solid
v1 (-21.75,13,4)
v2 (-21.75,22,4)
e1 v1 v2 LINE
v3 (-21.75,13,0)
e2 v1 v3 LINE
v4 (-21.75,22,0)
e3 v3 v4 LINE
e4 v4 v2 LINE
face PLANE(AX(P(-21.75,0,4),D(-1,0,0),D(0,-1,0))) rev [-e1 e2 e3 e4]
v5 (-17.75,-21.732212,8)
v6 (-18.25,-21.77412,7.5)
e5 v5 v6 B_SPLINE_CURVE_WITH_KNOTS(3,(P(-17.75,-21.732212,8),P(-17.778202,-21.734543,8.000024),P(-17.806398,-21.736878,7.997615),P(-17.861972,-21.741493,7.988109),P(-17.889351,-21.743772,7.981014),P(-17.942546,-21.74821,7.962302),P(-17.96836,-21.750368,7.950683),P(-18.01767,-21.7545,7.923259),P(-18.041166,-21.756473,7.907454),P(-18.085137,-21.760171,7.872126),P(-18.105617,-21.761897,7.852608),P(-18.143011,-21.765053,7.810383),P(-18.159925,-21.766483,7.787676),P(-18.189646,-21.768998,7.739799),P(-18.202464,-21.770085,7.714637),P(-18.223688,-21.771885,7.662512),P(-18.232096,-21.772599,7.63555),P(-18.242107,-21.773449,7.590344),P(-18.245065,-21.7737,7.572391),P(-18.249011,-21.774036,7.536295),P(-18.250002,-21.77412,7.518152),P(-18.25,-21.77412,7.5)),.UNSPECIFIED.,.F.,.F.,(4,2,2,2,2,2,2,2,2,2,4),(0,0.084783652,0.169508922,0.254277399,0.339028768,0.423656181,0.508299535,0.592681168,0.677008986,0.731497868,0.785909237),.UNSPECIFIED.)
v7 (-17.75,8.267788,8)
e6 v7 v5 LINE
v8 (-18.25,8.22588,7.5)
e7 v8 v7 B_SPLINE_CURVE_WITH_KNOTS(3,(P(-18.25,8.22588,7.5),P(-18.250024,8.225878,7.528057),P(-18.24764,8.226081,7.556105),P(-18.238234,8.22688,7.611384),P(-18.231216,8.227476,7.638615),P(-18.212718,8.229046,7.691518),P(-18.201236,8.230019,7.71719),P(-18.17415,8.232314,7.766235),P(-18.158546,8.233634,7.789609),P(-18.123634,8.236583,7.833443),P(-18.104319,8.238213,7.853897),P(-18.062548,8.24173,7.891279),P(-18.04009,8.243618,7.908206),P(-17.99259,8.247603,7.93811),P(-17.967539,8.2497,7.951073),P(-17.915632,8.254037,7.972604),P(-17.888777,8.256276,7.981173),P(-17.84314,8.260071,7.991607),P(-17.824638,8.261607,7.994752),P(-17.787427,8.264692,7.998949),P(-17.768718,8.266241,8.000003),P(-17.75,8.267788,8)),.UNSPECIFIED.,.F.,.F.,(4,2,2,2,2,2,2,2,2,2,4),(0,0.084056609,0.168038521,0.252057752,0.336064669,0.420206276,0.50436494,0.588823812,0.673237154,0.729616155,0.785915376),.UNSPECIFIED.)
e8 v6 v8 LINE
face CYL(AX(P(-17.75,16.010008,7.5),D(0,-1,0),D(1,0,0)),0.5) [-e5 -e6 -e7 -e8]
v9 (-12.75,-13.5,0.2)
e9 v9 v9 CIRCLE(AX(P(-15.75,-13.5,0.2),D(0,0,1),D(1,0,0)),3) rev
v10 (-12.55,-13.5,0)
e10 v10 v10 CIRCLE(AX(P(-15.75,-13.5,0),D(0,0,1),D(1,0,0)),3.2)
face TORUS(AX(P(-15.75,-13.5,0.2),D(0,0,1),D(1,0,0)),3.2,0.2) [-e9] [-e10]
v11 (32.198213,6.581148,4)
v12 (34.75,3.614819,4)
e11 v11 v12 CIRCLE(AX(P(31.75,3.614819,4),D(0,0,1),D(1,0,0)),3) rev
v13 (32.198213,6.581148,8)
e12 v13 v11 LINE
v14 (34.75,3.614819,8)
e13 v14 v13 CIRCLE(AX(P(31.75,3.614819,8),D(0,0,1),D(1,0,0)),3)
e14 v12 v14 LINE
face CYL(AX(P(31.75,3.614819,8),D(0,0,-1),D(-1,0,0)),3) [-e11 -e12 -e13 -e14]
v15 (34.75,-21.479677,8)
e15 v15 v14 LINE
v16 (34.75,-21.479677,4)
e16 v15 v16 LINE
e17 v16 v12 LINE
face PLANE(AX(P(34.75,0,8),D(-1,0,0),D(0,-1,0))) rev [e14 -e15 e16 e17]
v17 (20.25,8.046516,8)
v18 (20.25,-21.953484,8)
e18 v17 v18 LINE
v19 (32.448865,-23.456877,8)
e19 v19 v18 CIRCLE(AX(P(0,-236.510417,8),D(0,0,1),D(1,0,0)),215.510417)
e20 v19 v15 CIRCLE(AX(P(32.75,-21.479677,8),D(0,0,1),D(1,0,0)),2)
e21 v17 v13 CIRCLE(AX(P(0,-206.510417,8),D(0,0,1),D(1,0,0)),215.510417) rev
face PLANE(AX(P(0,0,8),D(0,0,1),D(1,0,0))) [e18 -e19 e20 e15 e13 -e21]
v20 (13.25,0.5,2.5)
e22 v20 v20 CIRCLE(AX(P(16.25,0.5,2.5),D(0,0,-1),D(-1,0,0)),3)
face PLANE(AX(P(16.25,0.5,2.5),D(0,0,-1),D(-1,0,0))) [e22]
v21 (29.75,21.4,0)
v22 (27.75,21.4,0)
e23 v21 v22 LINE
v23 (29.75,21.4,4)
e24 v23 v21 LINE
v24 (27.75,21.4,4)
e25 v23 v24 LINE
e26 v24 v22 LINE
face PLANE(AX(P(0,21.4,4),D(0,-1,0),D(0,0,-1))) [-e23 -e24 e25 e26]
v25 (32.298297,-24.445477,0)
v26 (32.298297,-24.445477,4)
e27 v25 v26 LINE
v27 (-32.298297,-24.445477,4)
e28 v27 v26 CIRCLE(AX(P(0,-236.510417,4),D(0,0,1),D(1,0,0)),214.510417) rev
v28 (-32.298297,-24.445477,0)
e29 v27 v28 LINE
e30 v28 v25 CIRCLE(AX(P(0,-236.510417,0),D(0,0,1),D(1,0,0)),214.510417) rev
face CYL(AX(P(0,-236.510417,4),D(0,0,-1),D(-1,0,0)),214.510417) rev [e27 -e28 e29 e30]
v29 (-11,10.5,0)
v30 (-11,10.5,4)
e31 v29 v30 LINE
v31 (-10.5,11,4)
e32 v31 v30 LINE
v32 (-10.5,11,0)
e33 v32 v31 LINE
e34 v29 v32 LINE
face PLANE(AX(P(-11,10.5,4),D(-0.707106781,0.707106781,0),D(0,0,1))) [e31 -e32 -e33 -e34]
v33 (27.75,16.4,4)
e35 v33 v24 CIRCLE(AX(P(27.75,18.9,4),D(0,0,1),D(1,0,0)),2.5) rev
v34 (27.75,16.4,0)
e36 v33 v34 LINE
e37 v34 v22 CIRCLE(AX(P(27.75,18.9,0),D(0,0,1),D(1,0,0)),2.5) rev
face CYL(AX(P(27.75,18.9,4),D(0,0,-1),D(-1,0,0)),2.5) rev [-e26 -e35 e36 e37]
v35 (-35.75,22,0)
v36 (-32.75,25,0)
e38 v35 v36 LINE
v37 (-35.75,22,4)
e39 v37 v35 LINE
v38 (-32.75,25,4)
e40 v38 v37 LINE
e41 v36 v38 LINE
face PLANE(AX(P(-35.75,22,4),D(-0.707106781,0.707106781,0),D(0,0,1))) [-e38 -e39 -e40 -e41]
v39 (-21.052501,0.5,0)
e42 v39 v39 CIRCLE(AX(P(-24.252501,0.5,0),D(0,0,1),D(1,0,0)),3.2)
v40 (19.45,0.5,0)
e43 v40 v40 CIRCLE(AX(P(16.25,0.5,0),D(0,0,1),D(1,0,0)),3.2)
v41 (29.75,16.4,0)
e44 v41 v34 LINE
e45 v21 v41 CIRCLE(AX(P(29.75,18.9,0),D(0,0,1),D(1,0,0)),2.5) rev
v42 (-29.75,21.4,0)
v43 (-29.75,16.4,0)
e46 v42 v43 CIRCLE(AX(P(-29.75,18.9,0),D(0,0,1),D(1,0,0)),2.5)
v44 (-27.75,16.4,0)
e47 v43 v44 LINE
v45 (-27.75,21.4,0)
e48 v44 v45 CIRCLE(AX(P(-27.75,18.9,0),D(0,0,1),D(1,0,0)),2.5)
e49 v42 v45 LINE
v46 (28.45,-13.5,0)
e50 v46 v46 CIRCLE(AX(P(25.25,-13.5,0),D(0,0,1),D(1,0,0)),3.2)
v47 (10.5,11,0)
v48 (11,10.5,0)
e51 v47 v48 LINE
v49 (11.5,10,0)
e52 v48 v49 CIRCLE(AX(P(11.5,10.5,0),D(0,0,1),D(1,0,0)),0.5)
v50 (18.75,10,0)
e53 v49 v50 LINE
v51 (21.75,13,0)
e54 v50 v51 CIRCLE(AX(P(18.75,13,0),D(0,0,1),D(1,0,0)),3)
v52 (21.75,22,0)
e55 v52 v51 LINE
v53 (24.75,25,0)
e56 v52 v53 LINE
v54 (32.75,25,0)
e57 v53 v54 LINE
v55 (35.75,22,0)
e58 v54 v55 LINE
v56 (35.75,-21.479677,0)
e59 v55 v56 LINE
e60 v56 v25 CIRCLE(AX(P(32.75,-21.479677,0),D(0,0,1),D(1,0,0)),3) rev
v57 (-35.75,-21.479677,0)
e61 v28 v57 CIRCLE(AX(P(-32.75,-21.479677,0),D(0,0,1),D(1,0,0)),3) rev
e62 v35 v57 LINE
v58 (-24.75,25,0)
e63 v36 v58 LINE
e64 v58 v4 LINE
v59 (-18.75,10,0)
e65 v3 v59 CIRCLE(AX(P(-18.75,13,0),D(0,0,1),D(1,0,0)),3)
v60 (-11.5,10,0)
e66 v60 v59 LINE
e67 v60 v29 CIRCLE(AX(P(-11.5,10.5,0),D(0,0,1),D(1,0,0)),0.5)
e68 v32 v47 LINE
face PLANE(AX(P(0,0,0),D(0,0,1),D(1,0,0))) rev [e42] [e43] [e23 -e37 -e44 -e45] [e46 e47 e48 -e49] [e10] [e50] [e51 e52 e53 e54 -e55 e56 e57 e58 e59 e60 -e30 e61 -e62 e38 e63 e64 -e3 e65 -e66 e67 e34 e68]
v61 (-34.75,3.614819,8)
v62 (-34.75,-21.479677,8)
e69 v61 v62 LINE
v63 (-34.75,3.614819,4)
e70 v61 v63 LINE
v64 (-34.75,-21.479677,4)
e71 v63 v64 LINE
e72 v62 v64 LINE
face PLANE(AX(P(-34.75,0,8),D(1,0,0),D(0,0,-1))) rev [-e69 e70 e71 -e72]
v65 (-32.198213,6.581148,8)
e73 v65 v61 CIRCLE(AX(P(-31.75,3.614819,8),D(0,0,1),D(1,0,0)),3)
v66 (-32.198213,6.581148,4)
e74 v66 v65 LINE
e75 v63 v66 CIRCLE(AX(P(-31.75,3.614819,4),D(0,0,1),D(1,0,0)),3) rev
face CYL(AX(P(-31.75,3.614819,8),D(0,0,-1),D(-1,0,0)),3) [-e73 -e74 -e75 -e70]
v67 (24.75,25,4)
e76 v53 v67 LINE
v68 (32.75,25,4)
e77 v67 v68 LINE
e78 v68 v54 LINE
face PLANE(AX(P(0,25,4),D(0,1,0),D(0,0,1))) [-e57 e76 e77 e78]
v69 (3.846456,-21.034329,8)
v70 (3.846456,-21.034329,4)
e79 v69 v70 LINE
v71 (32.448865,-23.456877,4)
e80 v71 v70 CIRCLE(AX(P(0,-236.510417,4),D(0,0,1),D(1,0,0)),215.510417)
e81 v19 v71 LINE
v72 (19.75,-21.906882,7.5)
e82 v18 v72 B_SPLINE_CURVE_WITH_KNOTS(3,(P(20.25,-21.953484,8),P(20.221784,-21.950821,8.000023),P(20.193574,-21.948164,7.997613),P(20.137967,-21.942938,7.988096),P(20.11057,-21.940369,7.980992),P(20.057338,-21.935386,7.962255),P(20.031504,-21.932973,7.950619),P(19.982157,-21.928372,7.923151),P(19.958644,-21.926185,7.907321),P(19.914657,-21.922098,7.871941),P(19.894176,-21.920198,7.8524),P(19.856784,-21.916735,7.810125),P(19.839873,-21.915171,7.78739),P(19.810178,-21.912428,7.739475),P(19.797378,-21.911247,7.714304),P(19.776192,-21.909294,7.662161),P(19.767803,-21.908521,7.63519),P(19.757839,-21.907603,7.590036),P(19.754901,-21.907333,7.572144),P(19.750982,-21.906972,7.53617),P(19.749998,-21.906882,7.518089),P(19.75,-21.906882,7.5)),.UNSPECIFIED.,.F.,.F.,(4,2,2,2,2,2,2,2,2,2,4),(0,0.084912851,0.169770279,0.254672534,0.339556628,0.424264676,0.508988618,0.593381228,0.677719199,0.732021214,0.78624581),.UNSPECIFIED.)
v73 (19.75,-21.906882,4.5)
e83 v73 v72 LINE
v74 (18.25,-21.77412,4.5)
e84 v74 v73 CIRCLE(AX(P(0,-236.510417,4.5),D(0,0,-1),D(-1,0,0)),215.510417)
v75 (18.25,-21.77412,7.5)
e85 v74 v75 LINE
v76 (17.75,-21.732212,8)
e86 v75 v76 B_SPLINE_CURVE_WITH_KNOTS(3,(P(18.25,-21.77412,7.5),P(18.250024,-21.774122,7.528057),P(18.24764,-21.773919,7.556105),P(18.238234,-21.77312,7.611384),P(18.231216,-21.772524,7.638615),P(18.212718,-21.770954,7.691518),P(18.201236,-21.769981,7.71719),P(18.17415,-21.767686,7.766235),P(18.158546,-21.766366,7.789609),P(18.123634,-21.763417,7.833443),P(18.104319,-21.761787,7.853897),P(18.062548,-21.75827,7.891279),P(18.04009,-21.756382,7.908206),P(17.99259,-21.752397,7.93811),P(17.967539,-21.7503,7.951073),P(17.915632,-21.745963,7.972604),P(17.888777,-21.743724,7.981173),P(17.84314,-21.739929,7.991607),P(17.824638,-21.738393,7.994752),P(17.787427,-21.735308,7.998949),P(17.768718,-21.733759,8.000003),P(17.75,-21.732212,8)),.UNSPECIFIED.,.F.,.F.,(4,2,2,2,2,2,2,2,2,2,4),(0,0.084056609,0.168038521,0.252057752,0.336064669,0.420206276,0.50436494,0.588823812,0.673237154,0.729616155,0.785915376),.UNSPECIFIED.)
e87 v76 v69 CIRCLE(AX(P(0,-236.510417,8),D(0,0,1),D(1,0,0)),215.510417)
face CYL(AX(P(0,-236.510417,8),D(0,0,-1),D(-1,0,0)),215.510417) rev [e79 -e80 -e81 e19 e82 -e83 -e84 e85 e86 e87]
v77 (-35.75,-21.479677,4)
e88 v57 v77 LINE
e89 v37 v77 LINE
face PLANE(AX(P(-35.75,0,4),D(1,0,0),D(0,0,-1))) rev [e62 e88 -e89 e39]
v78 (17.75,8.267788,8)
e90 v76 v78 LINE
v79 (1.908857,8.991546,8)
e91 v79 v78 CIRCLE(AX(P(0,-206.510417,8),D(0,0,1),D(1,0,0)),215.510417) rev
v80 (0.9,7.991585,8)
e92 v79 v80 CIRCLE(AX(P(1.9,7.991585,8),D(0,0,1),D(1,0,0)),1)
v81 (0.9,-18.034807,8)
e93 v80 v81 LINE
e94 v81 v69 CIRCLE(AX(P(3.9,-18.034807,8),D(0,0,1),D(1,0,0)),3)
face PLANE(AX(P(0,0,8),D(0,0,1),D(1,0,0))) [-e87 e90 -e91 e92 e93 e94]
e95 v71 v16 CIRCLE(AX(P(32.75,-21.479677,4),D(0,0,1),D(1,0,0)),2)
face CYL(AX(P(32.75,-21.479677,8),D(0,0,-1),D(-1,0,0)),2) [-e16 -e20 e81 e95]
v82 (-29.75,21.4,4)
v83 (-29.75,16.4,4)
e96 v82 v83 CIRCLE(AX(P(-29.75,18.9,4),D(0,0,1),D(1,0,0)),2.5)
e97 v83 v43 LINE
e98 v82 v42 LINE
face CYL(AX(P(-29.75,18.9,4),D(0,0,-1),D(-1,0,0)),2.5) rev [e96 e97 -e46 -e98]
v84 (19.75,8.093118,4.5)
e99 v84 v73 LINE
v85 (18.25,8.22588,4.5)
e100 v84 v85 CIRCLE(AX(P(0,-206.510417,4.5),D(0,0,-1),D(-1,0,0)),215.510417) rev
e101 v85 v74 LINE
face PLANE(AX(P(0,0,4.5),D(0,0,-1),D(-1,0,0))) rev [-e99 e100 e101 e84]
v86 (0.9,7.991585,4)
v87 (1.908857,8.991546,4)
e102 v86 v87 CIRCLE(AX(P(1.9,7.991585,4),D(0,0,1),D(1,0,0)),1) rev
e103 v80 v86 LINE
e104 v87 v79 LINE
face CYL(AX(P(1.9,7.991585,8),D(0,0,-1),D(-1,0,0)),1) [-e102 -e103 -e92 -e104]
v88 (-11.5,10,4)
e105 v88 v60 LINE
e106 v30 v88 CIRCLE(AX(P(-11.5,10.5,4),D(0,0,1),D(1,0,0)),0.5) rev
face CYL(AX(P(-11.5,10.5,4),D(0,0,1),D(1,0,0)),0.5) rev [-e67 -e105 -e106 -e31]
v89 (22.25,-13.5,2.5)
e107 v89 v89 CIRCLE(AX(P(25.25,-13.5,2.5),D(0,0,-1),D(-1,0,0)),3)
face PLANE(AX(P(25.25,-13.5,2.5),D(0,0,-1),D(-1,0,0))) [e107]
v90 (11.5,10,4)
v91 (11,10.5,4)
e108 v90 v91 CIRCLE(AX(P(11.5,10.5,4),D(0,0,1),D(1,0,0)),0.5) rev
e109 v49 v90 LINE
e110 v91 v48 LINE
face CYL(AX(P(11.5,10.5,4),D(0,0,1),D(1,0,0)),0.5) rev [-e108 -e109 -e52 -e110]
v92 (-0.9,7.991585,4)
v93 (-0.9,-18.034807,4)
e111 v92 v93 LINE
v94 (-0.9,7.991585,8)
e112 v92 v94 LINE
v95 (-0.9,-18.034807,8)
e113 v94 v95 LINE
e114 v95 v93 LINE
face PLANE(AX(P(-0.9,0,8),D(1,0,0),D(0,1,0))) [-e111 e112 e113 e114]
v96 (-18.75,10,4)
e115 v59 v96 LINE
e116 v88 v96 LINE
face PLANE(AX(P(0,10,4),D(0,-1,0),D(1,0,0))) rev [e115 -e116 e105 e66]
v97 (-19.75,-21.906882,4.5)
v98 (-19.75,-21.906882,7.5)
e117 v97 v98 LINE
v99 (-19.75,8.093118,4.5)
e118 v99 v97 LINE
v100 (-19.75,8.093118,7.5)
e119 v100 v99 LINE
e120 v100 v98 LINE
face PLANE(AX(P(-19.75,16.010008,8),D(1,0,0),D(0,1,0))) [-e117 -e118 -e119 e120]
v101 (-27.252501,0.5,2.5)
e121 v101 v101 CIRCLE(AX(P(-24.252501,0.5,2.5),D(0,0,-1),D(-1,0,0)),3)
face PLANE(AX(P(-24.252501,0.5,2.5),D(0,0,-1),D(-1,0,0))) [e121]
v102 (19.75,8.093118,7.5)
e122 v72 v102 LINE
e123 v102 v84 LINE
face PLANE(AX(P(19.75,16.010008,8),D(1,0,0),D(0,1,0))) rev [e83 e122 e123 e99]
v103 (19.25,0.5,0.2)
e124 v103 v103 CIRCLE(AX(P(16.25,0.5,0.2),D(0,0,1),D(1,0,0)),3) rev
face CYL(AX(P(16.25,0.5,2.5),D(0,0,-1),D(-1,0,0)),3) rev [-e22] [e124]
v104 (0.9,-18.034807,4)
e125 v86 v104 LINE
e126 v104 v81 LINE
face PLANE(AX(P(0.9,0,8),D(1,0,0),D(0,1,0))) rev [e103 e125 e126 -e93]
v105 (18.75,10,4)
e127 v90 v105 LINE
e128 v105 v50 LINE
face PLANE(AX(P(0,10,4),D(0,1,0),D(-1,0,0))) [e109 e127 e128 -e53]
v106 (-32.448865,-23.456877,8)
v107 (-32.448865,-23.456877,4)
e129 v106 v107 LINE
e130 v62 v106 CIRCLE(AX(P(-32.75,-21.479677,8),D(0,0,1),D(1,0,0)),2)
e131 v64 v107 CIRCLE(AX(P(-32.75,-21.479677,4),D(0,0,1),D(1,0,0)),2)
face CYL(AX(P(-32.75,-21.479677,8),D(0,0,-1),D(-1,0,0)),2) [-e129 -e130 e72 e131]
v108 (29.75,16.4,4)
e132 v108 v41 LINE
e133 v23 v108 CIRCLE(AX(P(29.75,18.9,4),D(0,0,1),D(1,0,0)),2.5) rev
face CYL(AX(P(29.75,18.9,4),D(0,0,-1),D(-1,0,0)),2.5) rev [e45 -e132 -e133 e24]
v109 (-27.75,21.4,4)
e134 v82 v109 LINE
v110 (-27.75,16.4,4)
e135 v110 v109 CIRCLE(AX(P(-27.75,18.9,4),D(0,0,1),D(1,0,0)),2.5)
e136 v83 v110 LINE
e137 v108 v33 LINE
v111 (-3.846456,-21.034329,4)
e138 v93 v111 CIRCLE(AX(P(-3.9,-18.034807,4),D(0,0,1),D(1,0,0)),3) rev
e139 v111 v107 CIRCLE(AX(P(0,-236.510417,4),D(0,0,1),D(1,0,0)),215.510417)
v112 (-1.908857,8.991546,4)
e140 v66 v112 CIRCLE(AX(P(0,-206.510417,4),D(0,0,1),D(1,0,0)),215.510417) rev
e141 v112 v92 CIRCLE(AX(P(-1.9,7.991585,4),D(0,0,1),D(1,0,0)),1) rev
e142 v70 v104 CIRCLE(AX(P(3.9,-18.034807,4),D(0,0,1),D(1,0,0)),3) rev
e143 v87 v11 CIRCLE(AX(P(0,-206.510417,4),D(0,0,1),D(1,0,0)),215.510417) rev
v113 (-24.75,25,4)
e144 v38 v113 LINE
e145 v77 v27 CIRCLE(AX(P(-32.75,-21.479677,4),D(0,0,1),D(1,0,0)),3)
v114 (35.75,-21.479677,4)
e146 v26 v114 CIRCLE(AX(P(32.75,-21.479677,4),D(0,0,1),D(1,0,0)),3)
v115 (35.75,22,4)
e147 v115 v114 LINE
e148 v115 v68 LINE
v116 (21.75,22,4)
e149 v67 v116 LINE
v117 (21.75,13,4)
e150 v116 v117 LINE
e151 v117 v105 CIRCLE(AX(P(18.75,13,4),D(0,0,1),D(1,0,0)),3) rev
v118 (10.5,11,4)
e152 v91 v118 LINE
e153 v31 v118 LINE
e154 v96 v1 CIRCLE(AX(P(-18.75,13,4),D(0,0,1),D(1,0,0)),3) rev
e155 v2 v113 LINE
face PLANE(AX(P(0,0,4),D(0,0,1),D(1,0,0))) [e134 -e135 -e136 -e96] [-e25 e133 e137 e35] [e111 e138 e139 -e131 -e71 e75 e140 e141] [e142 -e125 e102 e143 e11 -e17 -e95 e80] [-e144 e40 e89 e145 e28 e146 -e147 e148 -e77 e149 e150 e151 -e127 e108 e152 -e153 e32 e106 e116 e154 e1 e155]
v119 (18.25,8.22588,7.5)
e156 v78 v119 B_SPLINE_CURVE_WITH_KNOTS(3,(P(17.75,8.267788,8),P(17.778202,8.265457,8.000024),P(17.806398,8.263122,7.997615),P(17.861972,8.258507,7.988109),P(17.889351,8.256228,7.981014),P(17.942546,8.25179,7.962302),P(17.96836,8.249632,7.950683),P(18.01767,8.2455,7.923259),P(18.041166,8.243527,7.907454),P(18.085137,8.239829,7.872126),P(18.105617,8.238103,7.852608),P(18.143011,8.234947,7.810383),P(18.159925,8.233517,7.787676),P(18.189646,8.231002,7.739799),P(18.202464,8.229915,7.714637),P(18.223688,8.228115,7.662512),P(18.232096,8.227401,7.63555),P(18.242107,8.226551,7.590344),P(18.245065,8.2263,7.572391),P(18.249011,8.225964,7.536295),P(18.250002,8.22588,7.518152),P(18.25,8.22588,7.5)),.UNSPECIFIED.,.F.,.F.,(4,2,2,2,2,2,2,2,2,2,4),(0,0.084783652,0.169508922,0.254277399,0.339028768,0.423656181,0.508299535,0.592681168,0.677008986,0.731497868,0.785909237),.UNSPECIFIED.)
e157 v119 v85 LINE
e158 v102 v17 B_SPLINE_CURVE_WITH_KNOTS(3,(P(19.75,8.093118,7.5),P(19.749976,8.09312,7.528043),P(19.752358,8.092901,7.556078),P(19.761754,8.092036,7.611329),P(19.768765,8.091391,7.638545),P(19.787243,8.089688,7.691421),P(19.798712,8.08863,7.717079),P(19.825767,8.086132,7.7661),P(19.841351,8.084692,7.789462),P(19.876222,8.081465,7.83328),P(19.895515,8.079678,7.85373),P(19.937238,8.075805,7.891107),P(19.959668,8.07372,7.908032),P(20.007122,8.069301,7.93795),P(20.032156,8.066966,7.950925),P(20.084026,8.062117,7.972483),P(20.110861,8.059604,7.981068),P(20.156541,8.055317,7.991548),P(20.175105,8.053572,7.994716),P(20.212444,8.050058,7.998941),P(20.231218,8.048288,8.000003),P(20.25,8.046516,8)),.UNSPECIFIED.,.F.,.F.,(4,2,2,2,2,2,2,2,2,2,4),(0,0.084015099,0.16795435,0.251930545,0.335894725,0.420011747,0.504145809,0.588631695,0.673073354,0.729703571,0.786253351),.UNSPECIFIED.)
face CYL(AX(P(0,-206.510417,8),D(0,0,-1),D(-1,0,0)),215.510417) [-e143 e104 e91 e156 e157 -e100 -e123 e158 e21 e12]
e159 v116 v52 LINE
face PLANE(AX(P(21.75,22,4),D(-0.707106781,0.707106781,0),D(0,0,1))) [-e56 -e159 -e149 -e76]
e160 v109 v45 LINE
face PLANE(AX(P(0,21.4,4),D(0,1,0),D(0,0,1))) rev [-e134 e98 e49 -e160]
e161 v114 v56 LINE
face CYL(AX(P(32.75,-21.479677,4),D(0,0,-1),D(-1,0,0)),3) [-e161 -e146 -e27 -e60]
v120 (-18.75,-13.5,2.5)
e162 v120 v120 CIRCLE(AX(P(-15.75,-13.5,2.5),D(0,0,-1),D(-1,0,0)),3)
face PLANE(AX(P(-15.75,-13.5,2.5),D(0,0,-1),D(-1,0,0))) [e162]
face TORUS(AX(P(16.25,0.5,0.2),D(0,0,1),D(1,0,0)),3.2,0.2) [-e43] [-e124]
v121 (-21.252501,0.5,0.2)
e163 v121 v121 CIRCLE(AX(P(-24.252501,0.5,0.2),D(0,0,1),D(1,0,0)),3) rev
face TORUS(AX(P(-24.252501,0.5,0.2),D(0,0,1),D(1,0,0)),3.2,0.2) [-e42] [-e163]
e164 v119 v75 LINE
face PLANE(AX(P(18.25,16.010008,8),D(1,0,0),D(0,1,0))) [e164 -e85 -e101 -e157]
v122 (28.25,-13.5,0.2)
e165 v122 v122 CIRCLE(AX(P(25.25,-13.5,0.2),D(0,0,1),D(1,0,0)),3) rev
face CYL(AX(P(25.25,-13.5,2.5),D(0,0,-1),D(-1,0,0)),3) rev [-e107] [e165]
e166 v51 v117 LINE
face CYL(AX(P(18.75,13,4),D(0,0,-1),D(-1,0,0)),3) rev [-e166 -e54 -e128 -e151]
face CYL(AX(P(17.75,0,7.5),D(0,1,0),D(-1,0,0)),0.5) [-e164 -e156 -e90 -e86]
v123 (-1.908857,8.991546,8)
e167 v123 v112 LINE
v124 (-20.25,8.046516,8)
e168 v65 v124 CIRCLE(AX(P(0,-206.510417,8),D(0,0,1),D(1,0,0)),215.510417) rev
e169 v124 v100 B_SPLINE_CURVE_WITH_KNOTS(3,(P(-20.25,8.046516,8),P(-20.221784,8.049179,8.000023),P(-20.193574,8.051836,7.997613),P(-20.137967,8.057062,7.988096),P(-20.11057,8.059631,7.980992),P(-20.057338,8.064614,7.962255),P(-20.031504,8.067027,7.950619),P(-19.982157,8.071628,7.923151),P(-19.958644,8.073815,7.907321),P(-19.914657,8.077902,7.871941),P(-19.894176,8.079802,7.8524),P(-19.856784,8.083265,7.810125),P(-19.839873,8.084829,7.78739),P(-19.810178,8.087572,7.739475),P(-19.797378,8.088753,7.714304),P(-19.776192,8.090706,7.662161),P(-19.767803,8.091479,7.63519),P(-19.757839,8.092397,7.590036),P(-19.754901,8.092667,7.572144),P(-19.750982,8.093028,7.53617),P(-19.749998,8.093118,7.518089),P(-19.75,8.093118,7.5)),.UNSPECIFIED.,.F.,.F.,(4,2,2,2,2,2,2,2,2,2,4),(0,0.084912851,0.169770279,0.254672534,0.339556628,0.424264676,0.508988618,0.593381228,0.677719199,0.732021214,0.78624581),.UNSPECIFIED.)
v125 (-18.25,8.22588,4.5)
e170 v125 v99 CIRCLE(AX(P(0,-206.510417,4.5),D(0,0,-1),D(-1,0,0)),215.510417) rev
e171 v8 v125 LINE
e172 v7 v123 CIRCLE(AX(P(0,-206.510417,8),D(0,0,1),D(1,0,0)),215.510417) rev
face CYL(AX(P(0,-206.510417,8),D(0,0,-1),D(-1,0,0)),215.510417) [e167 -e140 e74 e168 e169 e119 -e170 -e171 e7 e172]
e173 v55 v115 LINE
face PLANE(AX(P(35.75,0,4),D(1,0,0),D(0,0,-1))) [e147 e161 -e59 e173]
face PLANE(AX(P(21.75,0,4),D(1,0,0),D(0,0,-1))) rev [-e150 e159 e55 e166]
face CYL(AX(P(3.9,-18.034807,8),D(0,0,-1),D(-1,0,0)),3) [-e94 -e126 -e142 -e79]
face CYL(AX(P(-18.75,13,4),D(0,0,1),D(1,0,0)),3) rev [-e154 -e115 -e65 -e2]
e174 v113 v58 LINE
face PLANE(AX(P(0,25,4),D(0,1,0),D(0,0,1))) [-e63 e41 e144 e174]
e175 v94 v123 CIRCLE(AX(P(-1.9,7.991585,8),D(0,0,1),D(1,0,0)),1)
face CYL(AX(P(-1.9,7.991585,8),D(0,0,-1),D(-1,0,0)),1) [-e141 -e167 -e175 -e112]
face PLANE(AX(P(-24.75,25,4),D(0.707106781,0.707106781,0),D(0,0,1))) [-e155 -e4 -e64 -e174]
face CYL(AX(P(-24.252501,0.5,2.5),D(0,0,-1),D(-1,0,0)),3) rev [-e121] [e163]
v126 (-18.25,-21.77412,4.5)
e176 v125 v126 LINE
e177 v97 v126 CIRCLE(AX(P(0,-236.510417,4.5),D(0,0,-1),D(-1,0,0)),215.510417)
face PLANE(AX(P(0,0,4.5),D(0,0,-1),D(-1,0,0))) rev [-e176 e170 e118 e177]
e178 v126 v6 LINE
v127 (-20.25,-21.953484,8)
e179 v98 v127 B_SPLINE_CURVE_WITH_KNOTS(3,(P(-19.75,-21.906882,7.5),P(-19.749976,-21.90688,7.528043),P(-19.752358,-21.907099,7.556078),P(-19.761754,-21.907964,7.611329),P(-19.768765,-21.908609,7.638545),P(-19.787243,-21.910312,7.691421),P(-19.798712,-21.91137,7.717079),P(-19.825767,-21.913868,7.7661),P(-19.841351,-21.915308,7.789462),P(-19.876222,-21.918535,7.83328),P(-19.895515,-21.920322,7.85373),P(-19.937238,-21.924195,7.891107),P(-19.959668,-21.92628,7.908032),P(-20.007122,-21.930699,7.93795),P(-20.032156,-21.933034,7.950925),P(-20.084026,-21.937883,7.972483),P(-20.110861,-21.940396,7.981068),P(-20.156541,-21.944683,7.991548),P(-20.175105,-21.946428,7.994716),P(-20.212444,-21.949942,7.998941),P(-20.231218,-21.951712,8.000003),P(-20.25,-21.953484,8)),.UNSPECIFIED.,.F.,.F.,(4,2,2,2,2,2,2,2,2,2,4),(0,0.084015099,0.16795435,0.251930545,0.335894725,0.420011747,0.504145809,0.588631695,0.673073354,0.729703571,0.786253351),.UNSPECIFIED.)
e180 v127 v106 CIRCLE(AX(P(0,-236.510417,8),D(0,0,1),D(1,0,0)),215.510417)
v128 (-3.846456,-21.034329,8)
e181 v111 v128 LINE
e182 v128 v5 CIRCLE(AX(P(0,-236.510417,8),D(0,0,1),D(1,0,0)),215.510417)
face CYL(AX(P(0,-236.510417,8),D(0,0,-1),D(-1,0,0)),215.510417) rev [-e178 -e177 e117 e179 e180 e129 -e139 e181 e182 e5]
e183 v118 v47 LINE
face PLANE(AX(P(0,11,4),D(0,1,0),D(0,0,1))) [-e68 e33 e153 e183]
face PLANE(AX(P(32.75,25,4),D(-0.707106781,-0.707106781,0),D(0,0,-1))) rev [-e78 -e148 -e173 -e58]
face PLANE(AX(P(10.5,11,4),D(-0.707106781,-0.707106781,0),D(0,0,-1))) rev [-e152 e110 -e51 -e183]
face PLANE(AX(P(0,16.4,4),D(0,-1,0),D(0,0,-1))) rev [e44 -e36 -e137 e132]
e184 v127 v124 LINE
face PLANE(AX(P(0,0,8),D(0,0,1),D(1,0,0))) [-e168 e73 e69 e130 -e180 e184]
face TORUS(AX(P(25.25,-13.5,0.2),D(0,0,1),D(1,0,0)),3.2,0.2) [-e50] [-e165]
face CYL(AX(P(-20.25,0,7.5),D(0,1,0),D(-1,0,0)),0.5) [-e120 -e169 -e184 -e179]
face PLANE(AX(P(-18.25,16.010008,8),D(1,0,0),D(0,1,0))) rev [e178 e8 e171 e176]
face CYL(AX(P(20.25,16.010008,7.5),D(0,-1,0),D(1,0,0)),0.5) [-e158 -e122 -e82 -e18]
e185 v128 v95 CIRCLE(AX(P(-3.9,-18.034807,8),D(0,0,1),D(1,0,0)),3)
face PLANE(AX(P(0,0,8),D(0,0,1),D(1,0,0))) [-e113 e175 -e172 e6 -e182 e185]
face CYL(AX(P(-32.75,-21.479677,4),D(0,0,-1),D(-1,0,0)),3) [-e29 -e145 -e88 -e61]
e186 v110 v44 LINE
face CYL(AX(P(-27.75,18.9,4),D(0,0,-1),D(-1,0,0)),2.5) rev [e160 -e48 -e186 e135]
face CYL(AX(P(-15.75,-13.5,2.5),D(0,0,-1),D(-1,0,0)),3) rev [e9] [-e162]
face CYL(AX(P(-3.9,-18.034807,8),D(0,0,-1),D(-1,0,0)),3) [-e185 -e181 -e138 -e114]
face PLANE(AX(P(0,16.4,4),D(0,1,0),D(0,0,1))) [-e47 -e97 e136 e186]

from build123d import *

# Parameters (mm, degrees)
BOSS_EXTRUDE1_DEPTH     = 4
CHAMFER1_SIZE           = 3
FILLET1_R               = 3
FILLET2_R               = 0.5
CHAMFER2_SIZE           = 0.5
BOSS_EXTRUDE2_DEPTH     = 4
FILLET3_R               = 3
FILLET4_R               = 1
CUT_EXTRUDE_THIN1_START = 0.5
SKETCH3_W               = 1.5
SKETCH3_H               = 51.000458502
CUT_EXTRUDE_THIN1_DEPTH = 44.307105588
FILLET5_R               = 0.5
SKETCH4_R               = 3
CUT_EXTRUDE1_DEPTH      = 2.5
FILLET6_R               = 0.2


with BuildPart() as part:
    # Sketch1 → Boss-Extrude1 (new body)
    with BuildSketch(Plane.XY):
        with BuildLine():
            Line((11, 11), (-11, 11))
            Line((-11, 11), (-11, 10))
            Line((-11, 10), (-21.75, 10))
            Line((-21.75, 10), (-21.75, 11))
            Line((-21.75, 11), (-21.75, 25))
            Line((-21.75, 25), (-35.75, 25))
            Line((-35.75, 25), (-35.75, -25))
            ThreePointArc((-35.75, -25), (0, -22), (35.75, -25))
            Line((35.75, -25), (35.75, 25))
            Line((35.75, 25), (21.75, 25))
            Line((21.75, 25), (21.75, 11))
            Line((21.75, 11), (21.75, 10))
            Line((21.75, 10), (11, 10))
            Line((11, 10), (11, 11))
        make_face()
        with BuildLine():
            ThreePointArc((-29.75, 16.4), (-32.25, 18.9), (-29.75, 21.4))
            Line((-29.75, 21.4), (-27.75, 21.4))
            ThreePointArc((-27.75, 21.4), (-25.25, 18.9), (-27.75, 16.4))
            Line((-27.75, 16.4), (-29.75, 16.4))
        make_face(mode=Mode.SUBTRACT)
        with BuildLine():
            Line((27.75, 21.4), (29.75, 21.4))
            ThreePointArc((29.75, 21.4), (32.25, 18.9), (29.75, 16.4))
            Line((29.75, 16.4), (27.75, 16.4))
            ThreePointArc((27.75, 16.4), (25.25, 18.9), (27.75, 21.4))
        make_face(mode=Mode.SUBTRACT)
    extrude(amount=BOSS_EXTRUDE1_DEPTH)

    # Chamfer1
    chamfer1_edges = [part.edges().sort_by_distance(p)[0] for p in [
        (-35.75, 25, 2),
        (-21.75, 25, 2),
        (21.75, 25, 2),
        (35.75, 25, 2),
    ]]
    chamfer(chamfer1_edges, length=CHAMFER1_SIZE)

    # Fillet1
    fillet1_edges = [part.edges().sort_by_distance(p)[0] for p in [
        (-21.75, 10, 2),
        (21.75, 10, 2),
        (35.75, -25, 2),
        (-35.75, -25, 2),
    ]]
    fillet(fillet1_edges, radius=FILLET1_R)

    # Fillet2
    fillet2_edges = [part.edges().sort_by_distance(p)[0] for p in [
        (-11, 10, 2),
        (11, 10, 2),
    ]]
    fillet(fillet2_edges, radius=FILLET2_R)

    # Chamfer2
    chamfer2_edges = [part.edges().sort_by_distance(p)[0] for p in [
        (-11, 11, 2),
        (11, 11, 2),
    ]]
    chamfer(chamfer2_edges, length=CHAMFER2_SIZE - 0.0001)  # a hair under: the kernel refuses the full size

    # Sketch2 → Boss-Extrude2 (add)
    with BuildSketch(Plane.XY.offset(4)):
        with BuildLine():
            Line((-0.9, -21.001879268), (-0.9, 8.998120732))
            ThreePointArc((-0.9, 8.998120732), (-17.880609494, 8.256953983), (-34.75, 6.179915017))
            Line((-34.75, 6.179915017), (-34.75, -21.479677333))
            ThreePointArc((-34.75, -21.479677333), (-34.053405155, -22.996626575), (-32.448864997, -23.456876794))
            ThreePointArc((-32.448864997, -23.456876794), (-16.719552995, -21.649540192), (-0.9, -21.001879268))
        make_face()
        with BuildLine():
            ThreePointArc((34.75, 6.179915017), (17.880609494, 8.256953983), (0.9, 8.998120732))
            Line((0.9, 8.998120732), (0.9, -21.001879268))
            ThreePointArc((0.9, -21.001879268), (16.719552995, -21.649540192), (32.448864997, -23.456876794))
            ThreePointArc((32.448864997, -23.456876794), (34.053405155, -22.996626575), (34.75, -21.479677333))
            Line((34.75, -21.479677333), (34.75, 6.179915017))
        make_face()
    extrude(amount=BOSS_EXTRUDE2_DEPTH)

    # Fillet3
    fillet3_edges = [part.edges().sort_by_distance(p)[0] for p in [
        (-0.9, -21.001879268, 6),
        (-34.75, 6.179915017, 6),
        (0.9, -21.001879268, 6),
        (34.75, 6.179915017, 6),
    ]]
    fillet(fillet3_edges, radius=FILLET3_R)

    # Fillet4
    fillet4_edges = [part.edges().sort_by_distance(p)[0] for p in [
        (-0.9, 8.998120732, 6),
        (0.9, 8.998120732, 6),
    ]]
    fillet(fillet4_edges, radius=FILLET4_R)

    # Sketch3 → Cut-Extrude-Thin1 (cut, through all)
    with BuildSketch(Plane.XY.offset(4).offset(CUT_EXTRUDE_THIN1_START)):
        with Locations((-19, -9.490221292)):
            Rectangle(SKETCH3_W, SKETCH3_H)
        with Locations((19, -9.490221292)):
            Rectangle(SKETCH3_W, SKETCH3_H)
    extrude(amount=CUT_EXTRUDE_THIN1_DEPTH, mode=Mode.SUBTRACT)

    # Fillet5
    fillet5_edges = [part.edges().sort_by_distance(p)[0] for p in [
        (-18.25, -6.7741198, 8),
        (-19.75, -6.906881766, 8),
        (19.75, -6.906881766, 8),
        (18.25, -6.7741198, 8),
    ]]
    fillet(fillet5_edges, radius=FILLET5_R)

    # Sketch4 → Cut-Extrude1 (cut)
    with BuildSketch(Plane(origin=(0, 0, 0), x_dir=(-1, 0, 0), z_dir=(0, 0, -1))):
        with Locations((-16.25, 0.5)):
            Circle(SKETCH4_R)
        with Locations((24.252501254, 0.5)):
            Circle(SKETCH4_R)
        with Locations((15.75, -13.5)):
            Circle(SKETCH4_R)
        with Locations((-25.25, -13.5)):
            Circle(SKETCH4_R)
    extrude(amount=-CUT_EXTRUDE1_DEPTH, mode=Mode.SUBTRACT)

    # Fillet6
    fillet6_edges = [part.edges().sort_by_distance(p)[0] for p in [
        (19.25, 0.5, 0),
        (-21.252501254, 0.5, 0),
        (-12.75, -13.5, 0),
        (28.25, -13.5, 0),
    ]]
    fillet(fillet6_edges, radius=FILLET6_R)


solid = part.part
